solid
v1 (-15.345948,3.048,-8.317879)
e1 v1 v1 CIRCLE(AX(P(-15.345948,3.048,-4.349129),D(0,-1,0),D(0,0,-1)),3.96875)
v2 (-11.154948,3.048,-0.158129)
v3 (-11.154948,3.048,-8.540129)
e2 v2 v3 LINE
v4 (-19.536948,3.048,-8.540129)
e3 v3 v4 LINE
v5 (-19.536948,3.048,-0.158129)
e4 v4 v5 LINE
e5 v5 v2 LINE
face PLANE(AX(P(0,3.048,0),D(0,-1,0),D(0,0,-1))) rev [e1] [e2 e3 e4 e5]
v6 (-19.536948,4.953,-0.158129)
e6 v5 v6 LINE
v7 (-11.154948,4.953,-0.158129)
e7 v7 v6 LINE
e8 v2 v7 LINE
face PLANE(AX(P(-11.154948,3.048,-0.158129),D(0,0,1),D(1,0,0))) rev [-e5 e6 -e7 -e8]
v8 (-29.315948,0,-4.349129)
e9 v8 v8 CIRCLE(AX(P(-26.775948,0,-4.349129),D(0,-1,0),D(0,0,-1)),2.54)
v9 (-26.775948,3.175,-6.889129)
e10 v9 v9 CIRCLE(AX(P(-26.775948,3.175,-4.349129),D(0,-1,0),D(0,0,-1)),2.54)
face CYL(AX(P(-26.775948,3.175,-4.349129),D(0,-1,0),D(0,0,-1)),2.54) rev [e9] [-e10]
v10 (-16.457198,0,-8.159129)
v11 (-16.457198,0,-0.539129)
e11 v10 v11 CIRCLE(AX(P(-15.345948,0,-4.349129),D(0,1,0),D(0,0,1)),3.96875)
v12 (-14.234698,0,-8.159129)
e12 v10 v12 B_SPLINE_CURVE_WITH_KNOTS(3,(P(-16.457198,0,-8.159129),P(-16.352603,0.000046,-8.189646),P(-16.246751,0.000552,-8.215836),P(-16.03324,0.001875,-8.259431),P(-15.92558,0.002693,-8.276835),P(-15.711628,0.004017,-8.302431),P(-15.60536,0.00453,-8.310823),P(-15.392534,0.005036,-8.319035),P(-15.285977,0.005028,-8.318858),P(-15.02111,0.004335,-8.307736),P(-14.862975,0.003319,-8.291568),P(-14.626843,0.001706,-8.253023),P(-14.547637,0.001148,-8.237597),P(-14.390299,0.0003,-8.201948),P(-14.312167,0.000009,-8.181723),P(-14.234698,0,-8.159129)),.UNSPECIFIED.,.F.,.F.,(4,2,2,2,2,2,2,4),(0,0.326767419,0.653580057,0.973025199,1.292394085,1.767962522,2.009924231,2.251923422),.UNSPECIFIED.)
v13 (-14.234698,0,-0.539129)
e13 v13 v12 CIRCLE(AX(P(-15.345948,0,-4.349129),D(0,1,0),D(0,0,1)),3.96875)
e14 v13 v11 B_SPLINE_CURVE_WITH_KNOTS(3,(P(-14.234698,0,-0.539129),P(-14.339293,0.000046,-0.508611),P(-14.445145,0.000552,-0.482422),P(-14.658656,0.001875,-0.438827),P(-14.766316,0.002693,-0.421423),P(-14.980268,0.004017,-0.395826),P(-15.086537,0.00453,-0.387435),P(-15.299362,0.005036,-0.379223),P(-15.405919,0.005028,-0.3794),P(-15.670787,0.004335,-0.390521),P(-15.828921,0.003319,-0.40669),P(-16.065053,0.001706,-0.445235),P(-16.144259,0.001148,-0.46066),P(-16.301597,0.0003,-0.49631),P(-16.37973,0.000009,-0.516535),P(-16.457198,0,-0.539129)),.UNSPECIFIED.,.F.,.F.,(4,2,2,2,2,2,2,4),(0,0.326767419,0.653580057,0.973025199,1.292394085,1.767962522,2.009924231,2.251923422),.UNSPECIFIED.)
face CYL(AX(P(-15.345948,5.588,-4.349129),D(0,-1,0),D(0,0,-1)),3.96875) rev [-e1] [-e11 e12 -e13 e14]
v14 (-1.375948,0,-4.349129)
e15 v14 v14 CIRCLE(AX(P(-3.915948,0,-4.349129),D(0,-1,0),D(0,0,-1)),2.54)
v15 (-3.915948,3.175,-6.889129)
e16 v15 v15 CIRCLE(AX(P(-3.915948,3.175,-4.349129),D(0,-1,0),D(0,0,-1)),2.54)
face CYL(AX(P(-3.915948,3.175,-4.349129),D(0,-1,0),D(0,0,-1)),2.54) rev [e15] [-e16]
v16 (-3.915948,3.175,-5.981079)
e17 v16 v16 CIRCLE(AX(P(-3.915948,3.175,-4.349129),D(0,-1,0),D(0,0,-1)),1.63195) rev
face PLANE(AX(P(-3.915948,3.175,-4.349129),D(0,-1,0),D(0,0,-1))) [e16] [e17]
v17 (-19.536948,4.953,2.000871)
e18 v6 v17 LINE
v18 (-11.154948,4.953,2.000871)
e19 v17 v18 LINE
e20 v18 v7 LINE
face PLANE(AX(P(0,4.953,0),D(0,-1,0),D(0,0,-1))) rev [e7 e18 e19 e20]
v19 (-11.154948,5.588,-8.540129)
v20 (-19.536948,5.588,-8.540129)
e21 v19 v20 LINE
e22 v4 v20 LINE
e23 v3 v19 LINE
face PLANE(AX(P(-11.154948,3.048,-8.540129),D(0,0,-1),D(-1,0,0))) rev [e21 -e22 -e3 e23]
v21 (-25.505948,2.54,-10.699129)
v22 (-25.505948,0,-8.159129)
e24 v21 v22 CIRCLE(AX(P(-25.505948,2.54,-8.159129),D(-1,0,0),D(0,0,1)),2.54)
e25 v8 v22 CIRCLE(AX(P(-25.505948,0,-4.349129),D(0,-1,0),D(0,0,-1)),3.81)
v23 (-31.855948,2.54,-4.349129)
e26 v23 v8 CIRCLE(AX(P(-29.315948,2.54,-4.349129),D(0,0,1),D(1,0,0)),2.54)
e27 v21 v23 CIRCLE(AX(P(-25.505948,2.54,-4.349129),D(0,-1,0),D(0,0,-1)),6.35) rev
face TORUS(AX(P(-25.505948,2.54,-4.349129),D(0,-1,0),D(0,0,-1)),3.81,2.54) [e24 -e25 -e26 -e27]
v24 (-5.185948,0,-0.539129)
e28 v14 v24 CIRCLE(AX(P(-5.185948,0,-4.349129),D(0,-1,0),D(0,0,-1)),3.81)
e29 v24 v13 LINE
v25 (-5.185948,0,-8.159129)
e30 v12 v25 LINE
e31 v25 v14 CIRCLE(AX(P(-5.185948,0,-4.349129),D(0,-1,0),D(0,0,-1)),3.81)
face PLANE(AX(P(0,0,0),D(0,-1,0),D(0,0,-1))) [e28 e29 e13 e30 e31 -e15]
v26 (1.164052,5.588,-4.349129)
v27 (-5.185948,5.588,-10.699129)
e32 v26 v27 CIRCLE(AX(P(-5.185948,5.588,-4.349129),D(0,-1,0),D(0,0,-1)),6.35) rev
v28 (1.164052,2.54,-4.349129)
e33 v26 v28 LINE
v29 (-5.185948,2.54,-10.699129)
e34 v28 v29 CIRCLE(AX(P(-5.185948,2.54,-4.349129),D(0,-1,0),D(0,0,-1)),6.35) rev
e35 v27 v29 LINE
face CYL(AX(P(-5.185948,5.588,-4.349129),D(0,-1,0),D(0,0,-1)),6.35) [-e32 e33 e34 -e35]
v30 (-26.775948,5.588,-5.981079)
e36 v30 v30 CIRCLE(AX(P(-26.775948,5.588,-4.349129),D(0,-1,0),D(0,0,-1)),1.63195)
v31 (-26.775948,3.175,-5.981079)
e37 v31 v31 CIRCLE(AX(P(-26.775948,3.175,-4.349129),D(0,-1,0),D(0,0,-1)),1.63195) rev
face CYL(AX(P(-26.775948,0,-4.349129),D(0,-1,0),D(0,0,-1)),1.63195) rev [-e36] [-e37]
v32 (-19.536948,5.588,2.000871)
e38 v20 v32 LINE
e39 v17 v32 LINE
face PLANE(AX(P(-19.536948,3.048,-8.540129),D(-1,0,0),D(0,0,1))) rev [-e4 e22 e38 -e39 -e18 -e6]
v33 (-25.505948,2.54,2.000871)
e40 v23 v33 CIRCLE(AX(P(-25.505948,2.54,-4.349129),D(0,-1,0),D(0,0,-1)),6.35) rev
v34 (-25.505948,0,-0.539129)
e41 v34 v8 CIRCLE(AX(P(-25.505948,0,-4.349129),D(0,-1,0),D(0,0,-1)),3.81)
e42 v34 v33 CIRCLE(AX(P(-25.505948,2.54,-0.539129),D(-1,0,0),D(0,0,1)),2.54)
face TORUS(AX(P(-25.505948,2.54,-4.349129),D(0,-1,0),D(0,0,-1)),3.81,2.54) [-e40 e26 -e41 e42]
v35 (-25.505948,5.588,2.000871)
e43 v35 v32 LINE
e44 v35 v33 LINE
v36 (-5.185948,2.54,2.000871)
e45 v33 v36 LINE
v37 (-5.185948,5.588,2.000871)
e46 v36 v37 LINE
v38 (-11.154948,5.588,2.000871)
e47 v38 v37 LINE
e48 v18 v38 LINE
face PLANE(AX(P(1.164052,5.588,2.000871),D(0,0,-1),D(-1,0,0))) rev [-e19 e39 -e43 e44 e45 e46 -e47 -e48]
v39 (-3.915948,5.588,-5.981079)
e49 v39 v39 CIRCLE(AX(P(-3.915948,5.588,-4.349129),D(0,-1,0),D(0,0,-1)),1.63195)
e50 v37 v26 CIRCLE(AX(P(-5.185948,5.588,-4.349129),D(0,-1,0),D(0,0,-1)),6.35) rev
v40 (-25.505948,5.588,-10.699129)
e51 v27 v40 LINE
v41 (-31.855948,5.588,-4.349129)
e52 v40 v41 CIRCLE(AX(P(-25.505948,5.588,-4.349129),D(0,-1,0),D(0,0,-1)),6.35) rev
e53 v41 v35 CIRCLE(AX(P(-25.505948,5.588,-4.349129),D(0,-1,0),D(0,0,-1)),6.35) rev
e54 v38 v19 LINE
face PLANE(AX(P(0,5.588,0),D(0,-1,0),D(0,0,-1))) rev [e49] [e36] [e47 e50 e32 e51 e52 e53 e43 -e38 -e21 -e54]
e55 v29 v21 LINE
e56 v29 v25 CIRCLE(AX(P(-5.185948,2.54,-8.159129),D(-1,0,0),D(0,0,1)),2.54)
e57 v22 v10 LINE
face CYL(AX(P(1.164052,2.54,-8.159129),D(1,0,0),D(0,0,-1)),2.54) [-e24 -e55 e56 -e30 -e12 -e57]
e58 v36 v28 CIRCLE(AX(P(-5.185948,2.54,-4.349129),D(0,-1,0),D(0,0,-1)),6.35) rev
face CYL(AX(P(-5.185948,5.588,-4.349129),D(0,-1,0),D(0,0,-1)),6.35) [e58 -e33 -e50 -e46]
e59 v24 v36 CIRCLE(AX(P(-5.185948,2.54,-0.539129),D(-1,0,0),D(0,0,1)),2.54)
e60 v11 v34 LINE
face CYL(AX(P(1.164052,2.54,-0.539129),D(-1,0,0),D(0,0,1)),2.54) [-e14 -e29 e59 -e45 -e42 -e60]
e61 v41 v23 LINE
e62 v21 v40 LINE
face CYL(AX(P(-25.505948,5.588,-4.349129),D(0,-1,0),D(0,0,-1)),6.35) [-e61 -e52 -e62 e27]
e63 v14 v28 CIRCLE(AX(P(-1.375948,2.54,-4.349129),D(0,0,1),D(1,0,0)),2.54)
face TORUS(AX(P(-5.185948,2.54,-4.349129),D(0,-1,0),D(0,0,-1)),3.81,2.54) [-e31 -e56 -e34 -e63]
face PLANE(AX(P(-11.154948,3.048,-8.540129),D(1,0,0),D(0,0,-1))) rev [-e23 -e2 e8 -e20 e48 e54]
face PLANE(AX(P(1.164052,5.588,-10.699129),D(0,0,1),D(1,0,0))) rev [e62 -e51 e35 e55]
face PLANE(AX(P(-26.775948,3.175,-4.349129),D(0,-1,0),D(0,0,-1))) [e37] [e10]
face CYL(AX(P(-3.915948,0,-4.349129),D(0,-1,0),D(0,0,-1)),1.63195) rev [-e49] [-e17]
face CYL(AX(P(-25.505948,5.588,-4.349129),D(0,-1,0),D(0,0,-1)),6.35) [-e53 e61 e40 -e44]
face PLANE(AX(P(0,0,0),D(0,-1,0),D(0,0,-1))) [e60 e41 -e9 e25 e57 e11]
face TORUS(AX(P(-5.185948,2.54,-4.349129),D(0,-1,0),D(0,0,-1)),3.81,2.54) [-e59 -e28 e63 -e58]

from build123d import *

# Parameters (mm, degrees)
SKETCH1_W                 = 33.02
SKETCH1_H                 = 12.7
SKETCH1_R                 = 3.96875
BOSS_EXTRUDE1_DEPTH       = 5.588
SKETCH2_W                 = 8.382
SKETCH2_H                 = 8.382
CUT_EXTRUDE1_DEPTH        = 2.54
F_4_CLEARANCE_HOLE1_D     = 3.2639
F_4_CLEARANCE_HOLE1_DEPTH = 12.7
F_4_CLEARANCE_HOLE1_TIP   = 0.980574487
FILLET1_R                 = 6.35
SKETCH7_W                 = 8.382
SKETCH7_H                 = 2.159
CUT_EXTRUDE2_DEPTH        = 0.635
SKETCH9_R                 = 2.54
CUT_EXTRUDE3_DEPTH        = 3.175
FILLET3_R                 = 2.54


# Some blends are built 0.0001 mm under size
with BuildPart() as part:
    # Sketch1 → Boss-Extrude1 (new body)
    with BuildSketch(Plane(origin=(0, 0, 0), x_dir=(1, 0, 0), z_dir=(0, 1, 0))):
        with Locations((-15.345948133, 4.349128799)):
            Rectangle(SKETCH1_W, SKETCH1_H)
        with Locations(Location((-15.345948133, 4.349128799, 0), (0, 0, 270))):
            Circle(SKETCH1_R, mode=Mode.SUBTRACT)
    extrude(amount=BOSS_EXTRUDE1_DEPTH)

    # Sketch2 → Cut-Extrude1 (cut)
    with BuildSketch(Plane(origin=(0, 5.588, 0), x_dir=(1, 0, 0), z_dir=(0, 1, 0))):
        with Locations((-15.345948133, 4.349128799)):
            Rectangle(SKETCH2_W, SKETCH2_H)
    extrude(amount=-CUT_EXTRUDE1_DEPTH, mode=Mode.SUBTRACT)

    # #4 Clearance Hole1
    with Locations(Plane(origin=(0, 0, 0), x_dir=(-1, 0, 0), z_dir=(0, -1, 0))):
        with Locations((3.915948133, 4.349128799), (26.775948133, 4.349128799)):
            Hole(F_4_CLEARANCE_HOLE1_D / 2, depth=F_4_CLEARANCE_HOLE1_DEPTH)
            with Locations((0, 0, -(F_4_CLEARANCE_HOLE1_DEPTH + F_4_CLEARANCE_HOLE1_TIP / 2))):  # 118° drill point
                Cone(0, F_4_CLEARANCE_HOLE1_D / 2, F_4_CLEARANCE_HOLE1_TIP, mode=Mode.SUBTRACT)

    # Fillet1
    fillet1_edges = [part.edges().sort_by_distance(p)[0] for p in [
        (-31.855948133, 2.794, 2.000871201),
        (-31.855948133, 2.794, -10.699128799),
        (1.164051867, 2.794, -10.699128799),
        (1.164051867, 2.794, 2.000871201),
    ]]
    fillet(fillet1_edges, radius=FILLET1_R - 0.0001)  # a hair under: the kernel refuses the full size

    # Sketch7 → Cut-Extrude2 (cut)
    with BuildSketch(Plane(origin=(0, 5.588, 0), x_dir=(1, 0, 0), z_dir=(0, 1, 0))):
        with Locations((-15.345948133, -0.921371201)):
            Rectangle(SKETCH7_W, SKETCH7_H)
    extrude(amount=-CUT_EXTRUDE2_DEPTH, mode=Mode.SUBTRACT)

    # Sketch9 → Cut-Extrude3 (cut)
    with BuildSketch(Plane.XZ):
        with Locations(Location((-3.915948133, -4.349128799, 0), (0, 0, 270))):
            Circle(SKETCH9_R)
        with Locations(Location((-26.775948133, -4.349128799, 0), (0, 0, 270))):
            Circle(SKETCH9_R)
    extrude(amount=-CUT_EXTRUDE3_DEPTH, mode=Mode.SUBTRACT)

    # Fillet3
    # the kernel refuses this fillet: 2.54 mm, written as the material it takes off along each edge
    with BuildSketch(Plane(origin=(-25.506048133, 0, 2.000871201), x_dir=(0, 0, -1), z_dir=(1, 0, 0))) as fillet3_piece_1:
        with BuildLine():
            CenterArc((FILLET3_R, FILLET3_R), FILLET3_R, 180, 90)
            Line((0, FILLET3_R), (0, 0))
            Line((0, 0), (FILLET3_R, 0))
        make_face()
    extrude(amount=20.3202, mode=Mode.SUBTRACT)
    with BuildSketch(Plane(origin=(-5.185848133, 0, -10.699128799), x_dir=(0, 1, 0), z_dir=(-1, 0, 0))) as fillet3_piece_2:
        with BuildLine():
            CenterArc((FILLET3_R, -FILLET3_R), FILLET3_R, 90, 90)
            Line((0, -FILLET3_R), (0, 0))
            Line((0, 0), (FILLET3_R, 0))
        make_face()
    extrude(amount=20.3202, mode=Mode.SUBTRACT)
    with BuildSketch(Plane(origin=(-5.185848133, 0, -4.349028799), x_dir=(1, 0, 0), z_dir=(0, 0, -1))) as fillet3_piece_3:
        with BuildLine():
            CenterArc((6.3499 - FILLET3_R, -FILLET3_R), FILLET3_R, 0, 90)
            Line((6.3499, -FILLET3_R), (6.3499, 0))
            Line((6.3499, 0), (6.3499 - FILLET3_R, 0))
        make_face()
    revolve(axis=Axis((-5.185848133, 0, -4.349028799), (0, -1, 0)), revolution_arc=90, mode=Mode.SUBTRACT)
    with BuildSketch(Plane(origin=(-5.185848133, 0, -4.349228799), x_dir=(0, 0, -1), z_dir=(-1, 0, 0))) as fillet3_piece_4:
        with BuildLine():
            CenterArc((6.3499 - FILLET3_R, -FILLET3_R), FILLET3_R, 0, 90)
            Line((6.3499, -FILLET3_R), (6.3499, 0))
            Line((6.3499, 0), (6.3499 - FILLET3_R, 0))
        make_face()
    revolve(axis=Axis((-5.185848133, 0, -4.349228799), (0, -1, 0)), revolution_arc=90, mode=Mode.SUBTRACT)
    with BuildSketch(Plane(origin=(-25.506048133, 0, -4.349228799), x_dir=(0, 0, -1), z_dir=(1, 0, 0))) as fillet3_piece_5:
        with BuildLine():
            CenterArc((6.3499 - FILLET3_R, FILLET3_R), FILLET3_R, 270, 90)
            Line((6.3499, FILLET3_R), (6.3499, 0))
            Line((6.3499, 0), (6.3499 - FILLET3_R, 0))
        make_face()
    revolve(axis=Axis((-25.506048133, 0, -4.349228799), (0, 1, 0)), revolution_arc=90, mode=Mode.SUBTRACT)
    with BuildSketch(Plane(origin=(-25.506048133, 0, -4.349028799), x_dir=(-1, 0, 0), z_dir=(0, 0, -1))) as fillet3_piece_6:
        with BuildLine():
            CenterArc((6.3499 - FILLET3_R, FILLET3_R), FILLET3_R, 270, 90)
            Line((6.3499, FILLET3_R), (6.3499, 0))
            Line((6.3499, 0), (6.3499 - FILLET3_R, 0))
        make_face()
    revolve(axis=Axis((-25.506048133, 0, -4.349028799), (0, 1, 0)), revolution_arc=90, mode=Mode.SUBTRACT)
    with BuildSketch(Plane(origin=(-31.855948133, 0, -4.349228799), x_dir=(1, 0, 0), z_dir=(0, 0, 1)), Plane(origin=(1.164051867, 0, -4.349028799), x_dir=(-1, 0, 0), z_dir=(0, 0, -1))) as fillet3_piece_7:
        with BuildLine():
            CenterArc((FILLET3_R, FILLET3_R), FILLET3_R, 180, 90)
            Line((0, FILLET3_R), (0, 0))
            Line((0, 0), (FILLET3_R, 0))
        make_face()
    extrude(amount=0.0002, mode=Mode.SUBTRACT)


solid = part.part
